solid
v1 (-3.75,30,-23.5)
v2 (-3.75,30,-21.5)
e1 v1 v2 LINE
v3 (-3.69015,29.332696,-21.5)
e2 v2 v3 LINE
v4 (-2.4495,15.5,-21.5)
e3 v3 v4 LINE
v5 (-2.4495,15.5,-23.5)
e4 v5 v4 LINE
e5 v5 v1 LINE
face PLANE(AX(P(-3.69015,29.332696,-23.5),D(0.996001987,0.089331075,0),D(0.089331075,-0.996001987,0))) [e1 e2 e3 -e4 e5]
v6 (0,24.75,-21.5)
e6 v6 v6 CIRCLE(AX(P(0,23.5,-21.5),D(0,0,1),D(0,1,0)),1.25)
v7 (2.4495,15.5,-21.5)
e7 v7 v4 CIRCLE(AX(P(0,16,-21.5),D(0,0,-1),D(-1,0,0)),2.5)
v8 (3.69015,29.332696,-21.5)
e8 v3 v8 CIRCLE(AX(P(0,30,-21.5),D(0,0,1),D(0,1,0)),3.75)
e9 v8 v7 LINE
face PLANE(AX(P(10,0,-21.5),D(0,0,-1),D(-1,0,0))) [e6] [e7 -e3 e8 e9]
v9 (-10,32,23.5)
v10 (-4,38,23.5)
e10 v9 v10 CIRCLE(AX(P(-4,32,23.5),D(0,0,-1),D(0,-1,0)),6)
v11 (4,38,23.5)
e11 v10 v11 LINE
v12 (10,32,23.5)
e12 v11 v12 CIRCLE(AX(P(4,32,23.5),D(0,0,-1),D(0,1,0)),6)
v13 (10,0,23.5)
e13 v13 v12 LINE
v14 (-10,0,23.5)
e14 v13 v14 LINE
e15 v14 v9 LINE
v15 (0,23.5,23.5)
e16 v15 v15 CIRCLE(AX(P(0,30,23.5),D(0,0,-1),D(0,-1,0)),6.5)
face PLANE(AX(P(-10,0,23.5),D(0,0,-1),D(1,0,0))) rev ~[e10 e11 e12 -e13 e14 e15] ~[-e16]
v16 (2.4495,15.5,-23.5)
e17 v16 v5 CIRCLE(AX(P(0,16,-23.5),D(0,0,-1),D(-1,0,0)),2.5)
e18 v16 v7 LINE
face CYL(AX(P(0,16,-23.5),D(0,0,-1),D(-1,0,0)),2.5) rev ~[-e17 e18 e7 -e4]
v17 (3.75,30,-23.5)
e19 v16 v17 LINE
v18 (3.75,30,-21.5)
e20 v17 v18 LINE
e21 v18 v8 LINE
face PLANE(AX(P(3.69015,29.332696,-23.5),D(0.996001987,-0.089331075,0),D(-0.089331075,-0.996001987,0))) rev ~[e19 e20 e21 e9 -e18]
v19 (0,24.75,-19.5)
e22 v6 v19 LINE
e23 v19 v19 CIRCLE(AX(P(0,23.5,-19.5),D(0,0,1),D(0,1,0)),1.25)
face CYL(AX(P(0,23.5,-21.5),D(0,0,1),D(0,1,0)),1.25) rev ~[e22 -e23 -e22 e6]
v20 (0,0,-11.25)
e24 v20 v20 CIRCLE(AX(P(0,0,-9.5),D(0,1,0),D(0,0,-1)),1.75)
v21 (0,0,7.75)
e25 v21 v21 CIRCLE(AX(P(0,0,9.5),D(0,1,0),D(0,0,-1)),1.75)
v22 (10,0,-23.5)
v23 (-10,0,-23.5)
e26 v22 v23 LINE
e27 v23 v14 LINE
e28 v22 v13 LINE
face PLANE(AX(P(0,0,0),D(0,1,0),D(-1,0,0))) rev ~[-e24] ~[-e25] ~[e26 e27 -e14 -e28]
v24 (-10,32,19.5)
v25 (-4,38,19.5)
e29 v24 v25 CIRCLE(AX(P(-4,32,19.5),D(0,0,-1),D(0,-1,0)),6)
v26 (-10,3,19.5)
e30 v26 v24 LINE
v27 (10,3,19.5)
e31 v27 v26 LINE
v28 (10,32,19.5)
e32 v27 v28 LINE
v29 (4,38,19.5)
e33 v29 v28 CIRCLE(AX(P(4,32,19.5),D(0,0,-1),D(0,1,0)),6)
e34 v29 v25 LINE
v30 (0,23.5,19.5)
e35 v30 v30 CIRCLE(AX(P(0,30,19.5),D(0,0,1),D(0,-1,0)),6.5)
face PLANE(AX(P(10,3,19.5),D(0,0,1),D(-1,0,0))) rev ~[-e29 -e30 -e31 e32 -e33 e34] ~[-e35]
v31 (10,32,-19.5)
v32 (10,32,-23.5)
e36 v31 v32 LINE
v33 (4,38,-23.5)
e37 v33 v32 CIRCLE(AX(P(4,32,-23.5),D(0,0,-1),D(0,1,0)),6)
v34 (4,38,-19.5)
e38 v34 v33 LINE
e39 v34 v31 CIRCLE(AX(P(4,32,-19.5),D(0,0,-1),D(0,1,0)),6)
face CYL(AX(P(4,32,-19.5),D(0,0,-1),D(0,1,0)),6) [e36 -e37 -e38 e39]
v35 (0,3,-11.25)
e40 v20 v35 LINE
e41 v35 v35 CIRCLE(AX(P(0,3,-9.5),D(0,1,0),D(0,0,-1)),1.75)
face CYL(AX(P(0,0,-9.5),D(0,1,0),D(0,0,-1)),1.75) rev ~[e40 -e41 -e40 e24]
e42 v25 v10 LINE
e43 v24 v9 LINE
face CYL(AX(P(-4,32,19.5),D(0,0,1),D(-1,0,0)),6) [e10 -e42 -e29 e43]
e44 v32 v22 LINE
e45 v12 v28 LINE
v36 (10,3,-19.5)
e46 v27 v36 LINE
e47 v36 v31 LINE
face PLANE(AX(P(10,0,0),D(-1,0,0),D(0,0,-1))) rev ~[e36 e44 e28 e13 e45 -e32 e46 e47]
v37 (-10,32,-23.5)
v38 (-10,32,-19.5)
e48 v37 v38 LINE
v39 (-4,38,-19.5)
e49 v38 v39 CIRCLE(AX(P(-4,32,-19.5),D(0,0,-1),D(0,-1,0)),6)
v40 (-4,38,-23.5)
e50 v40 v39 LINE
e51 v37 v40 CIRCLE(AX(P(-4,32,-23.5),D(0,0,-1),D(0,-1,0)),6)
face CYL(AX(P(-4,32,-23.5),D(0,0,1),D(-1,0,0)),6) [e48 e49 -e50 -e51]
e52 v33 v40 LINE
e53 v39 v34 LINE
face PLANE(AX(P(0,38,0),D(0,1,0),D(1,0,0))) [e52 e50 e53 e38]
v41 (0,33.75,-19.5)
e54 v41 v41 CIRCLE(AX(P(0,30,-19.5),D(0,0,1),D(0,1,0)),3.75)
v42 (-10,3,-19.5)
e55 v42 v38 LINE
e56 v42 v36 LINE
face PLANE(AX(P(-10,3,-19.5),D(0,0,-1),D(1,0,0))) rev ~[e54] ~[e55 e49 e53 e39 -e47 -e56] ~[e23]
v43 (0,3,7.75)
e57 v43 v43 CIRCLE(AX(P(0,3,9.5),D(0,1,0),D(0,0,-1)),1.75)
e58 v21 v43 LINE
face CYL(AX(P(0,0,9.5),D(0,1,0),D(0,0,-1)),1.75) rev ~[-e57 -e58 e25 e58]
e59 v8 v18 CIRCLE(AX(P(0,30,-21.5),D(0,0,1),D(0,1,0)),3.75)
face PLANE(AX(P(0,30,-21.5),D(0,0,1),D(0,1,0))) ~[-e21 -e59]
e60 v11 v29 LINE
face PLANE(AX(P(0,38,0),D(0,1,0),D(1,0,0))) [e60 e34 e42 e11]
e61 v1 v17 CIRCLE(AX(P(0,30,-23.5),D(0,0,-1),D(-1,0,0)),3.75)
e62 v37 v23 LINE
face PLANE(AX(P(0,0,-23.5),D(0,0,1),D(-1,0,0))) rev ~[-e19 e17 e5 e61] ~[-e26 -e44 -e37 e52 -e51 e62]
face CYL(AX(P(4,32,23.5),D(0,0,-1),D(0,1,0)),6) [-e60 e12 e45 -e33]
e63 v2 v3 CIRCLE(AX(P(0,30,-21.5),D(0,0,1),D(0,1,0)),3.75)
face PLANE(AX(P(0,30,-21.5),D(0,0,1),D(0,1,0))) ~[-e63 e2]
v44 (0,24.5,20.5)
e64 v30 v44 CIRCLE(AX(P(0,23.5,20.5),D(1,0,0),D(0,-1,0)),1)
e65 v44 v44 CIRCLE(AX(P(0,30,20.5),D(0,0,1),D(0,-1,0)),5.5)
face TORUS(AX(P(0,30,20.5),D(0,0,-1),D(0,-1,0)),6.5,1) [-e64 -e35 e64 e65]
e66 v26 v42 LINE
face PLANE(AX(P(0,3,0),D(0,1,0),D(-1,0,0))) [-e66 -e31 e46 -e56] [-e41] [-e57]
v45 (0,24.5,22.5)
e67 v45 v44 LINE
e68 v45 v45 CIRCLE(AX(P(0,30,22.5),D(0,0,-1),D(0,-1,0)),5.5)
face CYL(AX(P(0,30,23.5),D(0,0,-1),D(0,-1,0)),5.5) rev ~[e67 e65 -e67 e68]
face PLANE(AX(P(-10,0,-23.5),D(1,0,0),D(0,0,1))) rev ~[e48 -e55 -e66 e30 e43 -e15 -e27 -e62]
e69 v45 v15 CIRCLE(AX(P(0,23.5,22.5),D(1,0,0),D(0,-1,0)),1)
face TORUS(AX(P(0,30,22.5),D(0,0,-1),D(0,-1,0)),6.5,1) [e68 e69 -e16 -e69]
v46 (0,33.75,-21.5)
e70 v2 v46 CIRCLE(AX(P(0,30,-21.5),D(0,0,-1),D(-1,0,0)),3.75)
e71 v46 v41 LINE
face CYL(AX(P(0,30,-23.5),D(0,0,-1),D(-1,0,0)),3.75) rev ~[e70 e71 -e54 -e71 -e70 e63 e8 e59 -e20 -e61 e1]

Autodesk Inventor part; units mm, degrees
ref_plane "YZ Plane" through (0, 0, 0) normal (1, 0, 0) x (0, 1, 0)
ref_plane "XZ Plane" through (0, 0, 0) normal (0, 1, 0) x (-1, 0, 0)
ref_plane "XY Plane" through (0, 0, 0) normal (0, 0, 1) x (1, 0, 0)
sketch "Sketch1" plane through (0, 0, 0) normal (0, 1, 0) x (-1, 0, 0)
  line L0 (14, 0) -> (-14, 0) projected
  line L1 (0, -32.9) -> (0, 32.9) projected
  line L2 (10, 23.5) -> (-10, 23.5)
  line L3 (-10, 23.5) -> (-10, -23.5)
  line L4 (-10, -23.5) -> (10, -23.5)
  line L5 (10, -23.5) -> (10, 23.5)
  point P0 (0, 0)
  dimension "d0" = 47
  dimension "d1" = 20
extrude "Extrusion1" add sketch "Sketch1" along normal blind 3
sketch "Sketch2" plane through (0, 3, 0) normal (0, 1, 0) x (1, 0, 0)
  line L0 (-10, -23.5) -> (10, -23.5) projected
  line L1 (10, -23.5) -> (10, 23.5) projected
  line L2 (10, 23.5) -> (-10, 23.5) projected
  line L3 (-10, 23.5) -> (-10, -23.5) projected
  line L4 (-10, -23.5) -> (10, -23.5)
  line L5 (10, -23.5) -> (10, -19.5)
  line L6 (10, -19.5) -> (-10, -19.5)
  line L7 (-10, -19.5) -> (-10, -23.5)
  line L8 (-10, 19.5) -> (10, 19.5)
  line L9 (10, 19.5) -> (10, 23.5)
  line L10 (10, 23.5) -> (-10, 23.5)
  line L11 (-10, 23.5) -> (-10, 19.5)
  line L12 (-10, -23.5) -> (10, -23.5) projected
  line L13 (-10, 23.5) -> (-10, -23.5) projected
  line L14 (10, -23.5) -> (10, 23.5) projected
  line L15 (10, 23.5) -> (-10, 23.5) projected
  point P0 (0, 0)
  dimension "d4" = 4
  dimension "d5" = 4
extrude "Extrusion2" add sketch "Sketch2" along normal blind 35 contours L3 L6 L1 L0 | L3 L2 L1 L8
sketch "Sketch3" plane through (-10, 0, 23.5) normal (0, 0, 1) x (1, 0, 0)
  point P0 (10, 0)
sketch "Sketch4" plane through (-10, 0, 23.5) normal (0, 0, 1) x (1, 0, 0)
  line L0 (0, 0) -> (20, 0) projected
  line L1 (20, 0) -> (20, 38) projected
  line L2 (0, 38) -> (20, 38) projected
  line L3 (0, 0) -> (0, 38) projected
  point P0 (10, 0)
  point P1 (10, 30)
  dimension "d8" = 10
  dimension "d9" = 8
hole "Hole1" at (0, 30, 23.5) direction (0, 0, -1) diameter 11 depth 43
fillet "Fillet1" radius 6 4 edges at (10, 38, -21.5) (-10, 38, -21.5) (10, 38, 21.5) (-10, 38, 21.5)
sketch "Sketch8" plane through (0, 0, 0) normal (0, -1, 0) x (1, 0, 0)
  line L0 (-10, 23.5) -> (10, 23.5) projected
  line L1 (-10, -23.5) -> (-10, 23.5) projected
  line L2 (10, -23.5) -> (-10, -23.5) projected
  line L3 (10, 23.5) -> (10, -23.5) projected
  line L4 (-14, 0) -> (14, 0) projected
  line L5 (0, -32.9) -> (0, 32.9) projected
  line L6 (10, -19.5) -> (-10, -19.5) projected
  line L7 (-10, 19.5) -> (10, 19.5) projected
  point P0 (0, 0)
  point P1 (0, -9.5)
  point P2 (0, 9.5)
  dimension "d37" = 10
  dimension "d38" = 10
  dimension "d75" = 19
hole "Hole3" at (0, 0, 9.5) at (0, 0, -9.5) direction (0, 1, 0) diameter 3.5 end through all
sketch "Sketch10" plane through (10, 0, -23.5) normal (0, 0, -1) x (-1, 0, 0)
  arc A0 (20, 32) -> (14, 38) centre (14, 32) ccw projected
  line L0 (6, 38) -> (14, 38) projected
  arc A1 (6, 38) -> (0, 32) centre (6, 32) ccw projected
  line L1 (0, 0) -> (0, 32) projected
  line L2 (0, 0) -> (20, 0) projected
  line L3 (20, 0) -> (20, 32) projected
  circle A2 centre (10, 30) radius 5.5 projected
  circle A3 centre (10, 30) radius 3.75
  circle A4 centre (10, 16) radius 2.5
  line L4 (-6.7241, 13.5) -> (37.2046, 13.5) construction
  line L5 (6.25, 30) -> (7.5505, 15.5)
  line L6 (13.75, 30) -> (12.4495, 15.5)
  point P0 (10, 0)
  dimension "d47" = 16.5
  dimension "d48" = 7.5
  dimension "d49" = 5
  dimension "d50" = 10
  dimension "d51" = 2
  dimension "d52" = 2
  dimension "d53" = 8
  dimension "d54" = 8
extrude "Extrusion4" cut sketch "Sketch10" against normal blind 2 contours L5 A3 L6 A2 | A2 L6 A4 L5 | L5 A3 L6 | A4 L6 L5 picked at (9.6017, 25.1271)
sketch "Sketch11" plane through (10, 0, -21.5) normal (0, 0, -1) x (-1, 0, 0)
  line L0 (7.5505, 15.5) -> (6.25, 30) projected
  arc A0 (7.5505, 15.5) -> (12.4495, 15.5) centre (10, 16) ccw projected
  line L1 (13.75, 30) -> (12.4495, 15.5) projected
  arc A1 (13.75, 30) -> (6.25, 30) centre (10, 30) ccw projected
  point P0 (10, 0)
hole "Hole4" at (0, 30, -21.5) direction (0, 0, 1) diameter 7.5 depth 41
sketch "Sketch12" plane through (10, 0, -21.5) normal (0, 0, -1) x (-1, 0, 0)
  arc A0 (6.3099, 29.3327) -> (13.6901, 29.3327) centre (10, 30) ccw projected
  line L0 (7.5505, 15.5) -> (6.3099, 29.3327) projected
  arc A1 (7.5505, 15.5) -> (12.4495, 15.5) centre (10, 16) ccw projected
  line L1 (13.6901, 29.3327) -> (12.4495, 15.5) projected
  line L2 (0, 0) -> (0, 32) projected
  point P0 (10, 0)
  point P1 (10, 23.5)
  dimension "d64" = 6.5
  dimension "d65" = 10
hole "Hole5" at (0, 23.5, -21.5) direction (0, 0, 1) diameter 2.5 depth 41
fillet "Fillet2" radius 1 1 edges at (0, 35.5, 19.5)
fillet "Fillet3" radius 1 1 edges at (0, 35.5, 23.5)
properties part number "new_femur"
